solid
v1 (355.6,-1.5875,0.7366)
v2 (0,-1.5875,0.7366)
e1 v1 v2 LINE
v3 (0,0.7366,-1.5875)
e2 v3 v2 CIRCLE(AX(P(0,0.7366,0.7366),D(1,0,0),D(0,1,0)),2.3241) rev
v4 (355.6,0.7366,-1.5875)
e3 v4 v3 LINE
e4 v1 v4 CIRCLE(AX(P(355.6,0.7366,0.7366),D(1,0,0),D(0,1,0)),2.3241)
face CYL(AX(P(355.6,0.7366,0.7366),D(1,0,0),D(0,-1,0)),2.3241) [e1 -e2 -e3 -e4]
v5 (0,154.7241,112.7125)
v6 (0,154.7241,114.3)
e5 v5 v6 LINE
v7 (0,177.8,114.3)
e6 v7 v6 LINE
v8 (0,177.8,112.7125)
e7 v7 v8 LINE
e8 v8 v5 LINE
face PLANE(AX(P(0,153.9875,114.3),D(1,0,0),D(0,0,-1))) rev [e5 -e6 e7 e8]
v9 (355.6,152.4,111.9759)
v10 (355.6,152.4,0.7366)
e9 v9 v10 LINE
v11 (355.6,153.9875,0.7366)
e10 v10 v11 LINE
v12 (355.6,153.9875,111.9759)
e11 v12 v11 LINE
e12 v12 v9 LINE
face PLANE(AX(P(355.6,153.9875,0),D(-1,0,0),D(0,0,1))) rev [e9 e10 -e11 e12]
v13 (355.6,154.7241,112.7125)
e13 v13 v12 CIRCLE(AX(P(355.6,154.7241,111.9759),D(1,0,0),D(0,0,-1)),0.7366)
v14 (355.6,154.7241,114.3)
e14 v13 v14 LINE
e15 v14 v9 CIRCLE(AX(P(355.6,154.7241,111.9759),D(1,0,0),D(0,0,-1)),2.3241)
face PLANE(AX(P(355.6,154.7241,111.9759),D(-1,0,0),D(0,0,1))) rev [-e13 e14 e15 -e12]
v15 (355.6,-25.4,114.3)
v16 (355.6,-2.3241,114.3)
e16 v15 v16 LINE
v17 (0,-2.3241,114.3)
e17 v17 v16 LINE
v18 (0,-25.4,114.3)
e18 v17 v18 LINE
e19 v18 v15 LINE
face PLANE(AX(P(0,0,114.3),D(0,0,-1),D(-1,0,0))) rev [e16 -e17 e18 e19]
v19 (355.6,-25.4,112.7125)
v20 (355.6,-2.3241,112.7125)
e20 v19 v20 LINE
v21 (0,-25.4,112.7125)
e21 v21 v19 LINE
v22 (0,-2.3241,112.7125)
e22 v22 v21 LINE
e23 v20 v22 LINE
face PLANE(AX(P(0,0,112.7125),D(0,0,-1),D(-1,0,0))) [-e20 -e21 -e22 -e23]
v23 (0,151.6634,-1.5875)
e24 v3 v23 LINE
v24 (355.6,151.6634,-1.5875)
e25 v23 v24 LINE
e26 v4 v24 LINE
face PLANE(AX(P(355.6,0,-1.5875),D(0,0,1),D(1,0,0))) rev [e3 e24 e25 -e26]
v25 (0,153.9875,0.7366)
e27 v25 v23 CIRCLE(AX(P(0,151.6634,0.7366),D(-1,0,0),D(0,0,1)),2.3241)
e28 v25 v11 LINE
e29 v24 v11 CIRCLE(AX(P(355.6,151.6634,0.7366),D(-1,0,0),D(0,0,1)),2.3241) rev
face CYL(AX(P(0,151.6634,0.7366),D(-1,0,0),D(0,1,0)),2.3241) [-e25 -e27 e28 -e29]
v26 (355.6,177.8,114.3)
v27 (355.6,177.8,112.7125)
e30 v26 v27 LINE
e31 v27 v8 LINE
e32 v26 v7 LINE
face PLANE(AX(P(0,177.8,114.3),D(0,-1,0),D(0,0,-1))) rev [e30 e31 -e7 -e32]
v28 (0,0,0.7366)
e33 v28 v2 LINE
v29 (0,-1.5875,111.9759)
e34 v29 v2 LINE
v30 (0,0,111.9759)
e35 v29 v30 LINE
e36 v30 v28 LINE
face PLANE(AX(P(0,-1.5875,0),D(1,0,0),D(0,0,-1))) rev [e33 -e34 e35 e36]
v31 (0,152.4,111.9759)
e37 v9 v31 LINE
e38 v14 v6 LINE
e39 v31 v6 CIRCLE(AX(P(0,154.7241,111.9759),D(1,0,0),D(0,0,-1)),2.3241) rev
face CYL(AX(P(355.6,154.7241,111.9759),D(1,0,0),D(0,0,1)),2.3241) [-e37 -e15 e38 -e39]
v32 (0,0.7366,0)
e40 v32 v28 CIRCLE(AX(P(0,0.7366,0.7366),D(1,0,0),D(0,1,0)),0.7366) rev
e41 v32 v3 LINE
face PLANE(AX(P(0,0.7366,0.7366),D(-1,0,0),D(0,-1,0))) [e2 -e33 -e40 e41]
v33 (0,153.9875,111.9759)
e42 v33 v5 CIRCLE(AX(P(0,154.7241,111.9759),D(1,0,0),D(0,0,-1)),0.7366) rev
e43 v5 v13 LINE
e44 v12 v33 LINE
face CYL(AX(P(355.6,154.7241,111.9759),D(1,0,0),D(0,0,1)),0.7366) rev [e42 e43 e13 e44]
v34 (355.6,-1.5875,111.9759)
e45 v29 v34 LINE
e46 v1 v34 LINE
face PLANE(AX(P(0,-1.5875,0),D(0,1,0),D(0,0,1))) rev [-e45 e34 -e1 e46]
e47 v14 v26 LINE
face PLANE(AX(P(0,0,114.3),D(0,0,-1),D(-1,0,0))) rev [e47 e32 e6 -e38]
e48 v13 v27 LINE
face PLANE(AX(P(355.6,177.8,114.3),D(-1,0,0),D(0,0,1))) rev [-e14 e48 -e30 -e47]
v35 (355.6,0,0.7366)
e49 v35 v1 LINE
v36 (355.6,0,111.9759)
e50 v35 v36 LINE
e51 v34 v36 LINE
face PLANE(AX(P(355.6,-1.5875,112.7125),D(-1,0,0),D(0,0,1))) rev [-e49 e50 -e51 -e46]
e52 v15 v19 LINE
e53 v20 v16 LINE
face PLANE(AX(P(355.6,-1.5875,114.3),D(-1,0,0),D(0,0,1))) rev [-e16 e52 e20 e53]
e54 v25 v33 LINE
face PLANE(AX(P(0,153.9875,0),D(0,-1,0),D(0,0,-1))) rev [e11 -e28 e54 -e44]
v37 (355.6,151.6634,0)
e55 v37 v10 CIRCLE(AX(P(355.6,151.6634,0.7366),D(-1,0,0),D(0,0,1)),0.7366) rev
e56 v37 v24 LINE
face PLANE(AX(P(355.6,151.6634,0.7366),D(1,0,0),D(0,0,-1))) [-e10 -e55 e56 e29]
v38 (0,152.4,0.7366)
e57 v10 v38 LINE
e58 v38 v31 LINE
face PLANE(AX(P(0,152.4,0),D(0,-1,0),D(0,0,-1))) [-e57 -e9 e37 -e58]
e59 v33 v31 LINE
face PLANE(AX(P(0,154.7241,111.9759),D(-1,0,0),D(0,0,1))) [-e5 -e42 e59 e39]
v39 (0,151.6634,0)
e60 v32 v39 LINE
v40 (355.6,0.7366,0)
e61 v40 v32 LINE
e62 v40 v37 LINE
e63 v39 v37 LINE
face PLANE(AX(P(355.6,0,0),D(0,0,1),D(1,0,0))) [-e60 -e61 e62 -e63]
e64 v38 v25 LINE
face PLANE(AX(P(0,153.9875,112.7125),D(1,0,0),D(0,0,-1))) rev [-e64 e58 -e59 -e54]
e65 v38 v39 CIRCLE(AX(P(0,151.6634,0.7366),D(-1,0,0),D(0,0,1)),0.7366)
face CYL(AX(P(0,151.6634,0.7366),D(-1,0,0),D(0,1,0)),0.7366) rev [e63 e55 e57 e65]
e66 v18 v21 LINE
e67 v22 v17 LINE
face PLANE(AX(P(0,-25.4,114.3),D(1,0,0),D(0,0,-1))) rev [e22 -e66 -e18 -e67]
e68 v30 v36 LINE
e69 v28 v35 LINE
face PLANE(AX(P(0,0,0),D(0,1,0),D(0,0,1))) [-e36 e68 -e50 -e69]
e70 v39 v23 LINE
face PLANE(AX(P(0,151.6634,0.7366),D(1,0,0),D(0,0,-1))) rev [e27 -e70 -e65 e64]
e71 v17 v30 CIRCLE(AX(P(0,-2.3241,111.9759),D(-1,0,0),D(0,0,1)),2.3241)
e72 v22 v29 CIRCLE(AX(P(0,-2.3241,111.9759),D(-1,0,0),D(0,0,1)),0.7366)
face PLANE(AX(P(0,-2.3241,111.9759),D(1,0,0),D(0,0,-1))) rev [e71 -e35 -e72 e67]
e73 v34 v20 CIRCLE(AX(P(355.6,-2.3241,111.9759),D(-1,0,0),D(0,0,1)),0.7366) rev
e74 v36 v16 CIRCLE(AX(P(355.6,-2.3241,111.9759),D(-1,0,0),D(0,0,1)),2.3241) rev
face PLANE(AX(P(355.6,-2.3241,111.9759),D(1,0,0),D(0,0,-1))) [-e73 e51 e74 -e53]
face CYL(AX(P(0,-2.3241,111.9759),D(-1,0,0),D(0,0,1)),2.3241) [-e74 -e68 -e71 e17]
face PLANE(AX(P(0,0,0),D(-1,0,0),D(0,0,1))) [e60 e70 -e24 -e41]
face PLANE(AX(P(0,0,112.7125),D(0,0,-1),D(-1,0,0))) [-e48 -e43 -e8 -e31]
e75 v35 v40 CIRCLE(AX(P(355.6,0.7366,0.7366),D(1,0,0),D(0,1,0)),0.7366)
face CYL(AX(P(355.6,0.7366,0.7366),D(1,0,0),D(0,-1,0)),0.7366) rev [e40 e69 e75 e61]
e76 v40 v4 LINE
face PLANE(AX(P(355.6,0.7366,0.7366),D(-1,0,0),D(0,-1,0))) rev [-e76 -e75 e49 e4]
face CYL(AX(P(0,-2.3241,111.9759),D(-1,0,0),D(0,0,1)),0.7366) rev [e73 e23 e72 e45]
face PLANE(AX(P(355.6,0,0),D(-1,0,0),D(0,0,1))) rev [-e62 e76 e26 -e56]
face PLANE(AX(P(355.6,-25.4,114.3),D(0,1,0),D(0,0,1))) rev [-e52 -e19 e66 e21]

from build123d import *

# Parameters (mm, degrees)
SKETCH1_W                      = 1.5875
SKETCH1_H                      = 152.4
BASE_FLANGE1_DEPTH             = 355.6
EDGE_FLANGE1_STRIP_W           = 7.8232
EDGE_FLANGE1_STRIP_H           = 1.5875
EDGE_FLANGE1_STRIP_CUT_DEPTH   = 355.6
EDGE_FLANGE1_STRIP_2_W         = 7.8232
EDGE_FLANGE1_STRIP_2_H         = 1.5875
EDGE_FLANGE1_STRIP_CUT_2_DEPTH = 355.6
EDGE_FLANGE1_DEPTH             = 355.6
EDGE_FLANGE1_BEND_DEPTH        = 355.6
EDGE_FLANGE2_STRIP_W           = 7.8232
EDGE_FLANGE2_STRIP_H           = 1.5875
EDGE_FLANGE2_STRIP_CUT_DEPTH   = 355.6
EDGE_FLANGE2_STRIP_2_W         = 7.8232
EDGE_FLANGE2_STRIP_2_H         = 1.5875
EDGE_FLANGE2_STRIP_CUT_2_DEPTH = 355.6
EDGE_FLANGE2_DEPTH             = 355.6
EDGE_FLANGE2_BEND_DEPTH        = 355.6


# Sheet-metal steps are written as plain solids
with BuildPart() as part:
    # Sketch1 → Base-Flange1 (new body)
    with BuildSketch(Plane(origin=(0, 0, 0), x_dir=(0, 0, -1), z_dir=(1, 0, 0))):
        with Locations((0.79375, 76.2)):
            Rectangle(SKETCH1_W, SKETCH1_H)
    extrude(amount=BASE_FLANGE1_DEPTH)

    # Edge-Flange1 strip (across the edge) → Edge-Flange1 strip cut (cut)
    with BuildSketch(Plane(origin=(355.6, 152.4, 0), x_dir=(0, -1, 0), z_dir=(-1, 0, 0))):
        with Locations((-3.175, -0.79375)):
            Rectangle(EDGE_FLANGE1_STRIP_W, EDGE_FLANGE1_STRIP_H)
    extrude(amount=EDGE_FLANGE1_STRIP_CUT_DEPTH, mode=Mode.SUBTRACT)

    # Edge-Flange1 strip 2 (across the edge) → Edge-Flange1 strip cut 2 (cut)
    with BuildSketch(Plane.YZ):
        with Locations((-3.175, -0.79375)):
            Rectangle(EDGE_FLANGE1_STRIP_2_W, EDGE_FLANGE1_STRIP_2_H)
    extrude(amount=EDGE_FLANGE1_STRIP_CUT_2_DEPTH, mode=Mode.SUBTRACT)

    # Edge-Flange1 section (across the edge) → Edge-Flange1 (add)
    with BuildSketch(Plane(origin=(355.6, 152.4, 0), x_dir=(0, -1, 0), z_dir=(-1, 0, 0))):
        with BuildLine():
            Line((-1.5875, 0.7366), (-1.5875, 112.7125))
            Line((-1.5875, 112.7125), (0, 112.7125))
            Line((0, 112.7125), (0, 0.7366))
            ThreePointArc((0, 0.7366), (0.215745145, 0.215745145), (0.7366, 0))
            Line((0.7366, 0), (0.7366, -1.5875))
            ThreePointArc((0.7366, -1.5875), (-0.90678687, -0.90678687), (-1.5875, 0.7366))
        make_face()
    extrude(amount=EDGE_FLANGE1_DEPTH)

    # Edge-Flange1 section 2 (across the edge) → Edge-Flange1 bend (add)
    with BuildSketch(Plane.YZ):
        with BuildLine():
            Line((-1.5875, 0.7366), (-1.5875, 112.7125))
            Line((-1.5875, 112.7125), (0, 112.7125))
            Line((0, 112.7125), (0, 0.7366))
            ThreePointArc((0, 0.7366), (0.215745145, 0.215745145), (0.7366, 0))
            Line((0.7366, 0), (0.7366, -1.5875))
            ThreePointArc((0.7366, -1.5875), (-0.90678687, -0.90678687), (-1.5875, 0.7366))
        make_face()
    extrude(amount=EDGE_FLANGE1_BEND_DEPTH)

    # Edge-Flange2 strip (across the edge) → Edge-Flange2 strip cut (cut)
    with BuildSketch(Plane(origin=(0, 153.9875, 112.7125), x_dir=(0, 0, -1), z_dir=(1, 0, 0))):
        with Locations((-3.175, -0.79375)):
            Rectangle(EDGE_FLANGE2_STRIP_W, EDGE_FLANGE2_STRIP_H)
    extrude(amount=EDGE_FLANGE2_STRIP_CUT_DEPTH, mode=Mode.SUBTRACT)

    # Edge-Flange2 strip 2 (across the edge) → Edge-Flange2 strip cut 2 (cut)
    with BuildSketch(Plane(origin=(355.6, -1.5875, 112.7125), x_dir=(0, 0, -1), z_dir=(-1, 0, 0))):
        with Locations((-3.175, -0.79375)):
            Rectangle(EDGE_FLANGE2_STRIP_2_W, EDGE_FLANGE2_STRIP_2_H)
    extrude(amount=EDGE_FLANGE2_STRIP_CUT_2_DEPTH, mode=Mode.SUBTRACT)

    # Edge-Flange2 section (across the edge) → Edge-Flange2 (add)
    with BuildSketch(Plane(origin=(0, 153.9875, 112.7125), x_dir=(0, 0, -1), z_dir=(1, 0, 0))):
        with BuildLine():
            Line((-1.5875, 0.7366), (-1.5875, 23.8125))
            Line((-1.5875, 23.8125), (0, 23.8125))
            Line((0, 23.8125), (0, 0.7366))
            ThreePointArc((0, 0.7366), (0.215745145, 0.215745145), (0.7366, 0))
            Line((0.7366, 0), (0.7366, -1.5875))
            ThreePointArc((0.7366, -1.5875), (-0.90678687, -0.90678687), (-1.5875, 0.7366))
        make_face()
    extrude(amount=EDGE_FLANGE2_DEPTH)

    # Edge-Flange2 section 2 (across the edge) → Edge-Flange2 bend (add)
    with BuildSketch(Plane(origin=(355.6, -1.5875, 112.7125), x_dir=(0, 0, -1), z_dir=(-1, 0, 0))):
        with BuildLine():
            Line((-1.5875, 0.7366), (-1.5875, 23.8125))
            Line((-1.5875, 23.8125), (0, 23.8125))
            Line((0, 23.8125), (0, 0.7366))
            ThreePointArc((0, 0.7366), (0.215745145, 0.215745145), (0.7366, 0))
            Line((0.7366, 0), (0.7366, -1.5875))
            ThreePointArc((0.7366, -1.5875), (-0.90678687, -0.90678687), (-1.5875, 0.7366))
        make_face()
    extrude(amount=EDGE_FLANGE2_BEND_DEPTH)


solid = part.part
